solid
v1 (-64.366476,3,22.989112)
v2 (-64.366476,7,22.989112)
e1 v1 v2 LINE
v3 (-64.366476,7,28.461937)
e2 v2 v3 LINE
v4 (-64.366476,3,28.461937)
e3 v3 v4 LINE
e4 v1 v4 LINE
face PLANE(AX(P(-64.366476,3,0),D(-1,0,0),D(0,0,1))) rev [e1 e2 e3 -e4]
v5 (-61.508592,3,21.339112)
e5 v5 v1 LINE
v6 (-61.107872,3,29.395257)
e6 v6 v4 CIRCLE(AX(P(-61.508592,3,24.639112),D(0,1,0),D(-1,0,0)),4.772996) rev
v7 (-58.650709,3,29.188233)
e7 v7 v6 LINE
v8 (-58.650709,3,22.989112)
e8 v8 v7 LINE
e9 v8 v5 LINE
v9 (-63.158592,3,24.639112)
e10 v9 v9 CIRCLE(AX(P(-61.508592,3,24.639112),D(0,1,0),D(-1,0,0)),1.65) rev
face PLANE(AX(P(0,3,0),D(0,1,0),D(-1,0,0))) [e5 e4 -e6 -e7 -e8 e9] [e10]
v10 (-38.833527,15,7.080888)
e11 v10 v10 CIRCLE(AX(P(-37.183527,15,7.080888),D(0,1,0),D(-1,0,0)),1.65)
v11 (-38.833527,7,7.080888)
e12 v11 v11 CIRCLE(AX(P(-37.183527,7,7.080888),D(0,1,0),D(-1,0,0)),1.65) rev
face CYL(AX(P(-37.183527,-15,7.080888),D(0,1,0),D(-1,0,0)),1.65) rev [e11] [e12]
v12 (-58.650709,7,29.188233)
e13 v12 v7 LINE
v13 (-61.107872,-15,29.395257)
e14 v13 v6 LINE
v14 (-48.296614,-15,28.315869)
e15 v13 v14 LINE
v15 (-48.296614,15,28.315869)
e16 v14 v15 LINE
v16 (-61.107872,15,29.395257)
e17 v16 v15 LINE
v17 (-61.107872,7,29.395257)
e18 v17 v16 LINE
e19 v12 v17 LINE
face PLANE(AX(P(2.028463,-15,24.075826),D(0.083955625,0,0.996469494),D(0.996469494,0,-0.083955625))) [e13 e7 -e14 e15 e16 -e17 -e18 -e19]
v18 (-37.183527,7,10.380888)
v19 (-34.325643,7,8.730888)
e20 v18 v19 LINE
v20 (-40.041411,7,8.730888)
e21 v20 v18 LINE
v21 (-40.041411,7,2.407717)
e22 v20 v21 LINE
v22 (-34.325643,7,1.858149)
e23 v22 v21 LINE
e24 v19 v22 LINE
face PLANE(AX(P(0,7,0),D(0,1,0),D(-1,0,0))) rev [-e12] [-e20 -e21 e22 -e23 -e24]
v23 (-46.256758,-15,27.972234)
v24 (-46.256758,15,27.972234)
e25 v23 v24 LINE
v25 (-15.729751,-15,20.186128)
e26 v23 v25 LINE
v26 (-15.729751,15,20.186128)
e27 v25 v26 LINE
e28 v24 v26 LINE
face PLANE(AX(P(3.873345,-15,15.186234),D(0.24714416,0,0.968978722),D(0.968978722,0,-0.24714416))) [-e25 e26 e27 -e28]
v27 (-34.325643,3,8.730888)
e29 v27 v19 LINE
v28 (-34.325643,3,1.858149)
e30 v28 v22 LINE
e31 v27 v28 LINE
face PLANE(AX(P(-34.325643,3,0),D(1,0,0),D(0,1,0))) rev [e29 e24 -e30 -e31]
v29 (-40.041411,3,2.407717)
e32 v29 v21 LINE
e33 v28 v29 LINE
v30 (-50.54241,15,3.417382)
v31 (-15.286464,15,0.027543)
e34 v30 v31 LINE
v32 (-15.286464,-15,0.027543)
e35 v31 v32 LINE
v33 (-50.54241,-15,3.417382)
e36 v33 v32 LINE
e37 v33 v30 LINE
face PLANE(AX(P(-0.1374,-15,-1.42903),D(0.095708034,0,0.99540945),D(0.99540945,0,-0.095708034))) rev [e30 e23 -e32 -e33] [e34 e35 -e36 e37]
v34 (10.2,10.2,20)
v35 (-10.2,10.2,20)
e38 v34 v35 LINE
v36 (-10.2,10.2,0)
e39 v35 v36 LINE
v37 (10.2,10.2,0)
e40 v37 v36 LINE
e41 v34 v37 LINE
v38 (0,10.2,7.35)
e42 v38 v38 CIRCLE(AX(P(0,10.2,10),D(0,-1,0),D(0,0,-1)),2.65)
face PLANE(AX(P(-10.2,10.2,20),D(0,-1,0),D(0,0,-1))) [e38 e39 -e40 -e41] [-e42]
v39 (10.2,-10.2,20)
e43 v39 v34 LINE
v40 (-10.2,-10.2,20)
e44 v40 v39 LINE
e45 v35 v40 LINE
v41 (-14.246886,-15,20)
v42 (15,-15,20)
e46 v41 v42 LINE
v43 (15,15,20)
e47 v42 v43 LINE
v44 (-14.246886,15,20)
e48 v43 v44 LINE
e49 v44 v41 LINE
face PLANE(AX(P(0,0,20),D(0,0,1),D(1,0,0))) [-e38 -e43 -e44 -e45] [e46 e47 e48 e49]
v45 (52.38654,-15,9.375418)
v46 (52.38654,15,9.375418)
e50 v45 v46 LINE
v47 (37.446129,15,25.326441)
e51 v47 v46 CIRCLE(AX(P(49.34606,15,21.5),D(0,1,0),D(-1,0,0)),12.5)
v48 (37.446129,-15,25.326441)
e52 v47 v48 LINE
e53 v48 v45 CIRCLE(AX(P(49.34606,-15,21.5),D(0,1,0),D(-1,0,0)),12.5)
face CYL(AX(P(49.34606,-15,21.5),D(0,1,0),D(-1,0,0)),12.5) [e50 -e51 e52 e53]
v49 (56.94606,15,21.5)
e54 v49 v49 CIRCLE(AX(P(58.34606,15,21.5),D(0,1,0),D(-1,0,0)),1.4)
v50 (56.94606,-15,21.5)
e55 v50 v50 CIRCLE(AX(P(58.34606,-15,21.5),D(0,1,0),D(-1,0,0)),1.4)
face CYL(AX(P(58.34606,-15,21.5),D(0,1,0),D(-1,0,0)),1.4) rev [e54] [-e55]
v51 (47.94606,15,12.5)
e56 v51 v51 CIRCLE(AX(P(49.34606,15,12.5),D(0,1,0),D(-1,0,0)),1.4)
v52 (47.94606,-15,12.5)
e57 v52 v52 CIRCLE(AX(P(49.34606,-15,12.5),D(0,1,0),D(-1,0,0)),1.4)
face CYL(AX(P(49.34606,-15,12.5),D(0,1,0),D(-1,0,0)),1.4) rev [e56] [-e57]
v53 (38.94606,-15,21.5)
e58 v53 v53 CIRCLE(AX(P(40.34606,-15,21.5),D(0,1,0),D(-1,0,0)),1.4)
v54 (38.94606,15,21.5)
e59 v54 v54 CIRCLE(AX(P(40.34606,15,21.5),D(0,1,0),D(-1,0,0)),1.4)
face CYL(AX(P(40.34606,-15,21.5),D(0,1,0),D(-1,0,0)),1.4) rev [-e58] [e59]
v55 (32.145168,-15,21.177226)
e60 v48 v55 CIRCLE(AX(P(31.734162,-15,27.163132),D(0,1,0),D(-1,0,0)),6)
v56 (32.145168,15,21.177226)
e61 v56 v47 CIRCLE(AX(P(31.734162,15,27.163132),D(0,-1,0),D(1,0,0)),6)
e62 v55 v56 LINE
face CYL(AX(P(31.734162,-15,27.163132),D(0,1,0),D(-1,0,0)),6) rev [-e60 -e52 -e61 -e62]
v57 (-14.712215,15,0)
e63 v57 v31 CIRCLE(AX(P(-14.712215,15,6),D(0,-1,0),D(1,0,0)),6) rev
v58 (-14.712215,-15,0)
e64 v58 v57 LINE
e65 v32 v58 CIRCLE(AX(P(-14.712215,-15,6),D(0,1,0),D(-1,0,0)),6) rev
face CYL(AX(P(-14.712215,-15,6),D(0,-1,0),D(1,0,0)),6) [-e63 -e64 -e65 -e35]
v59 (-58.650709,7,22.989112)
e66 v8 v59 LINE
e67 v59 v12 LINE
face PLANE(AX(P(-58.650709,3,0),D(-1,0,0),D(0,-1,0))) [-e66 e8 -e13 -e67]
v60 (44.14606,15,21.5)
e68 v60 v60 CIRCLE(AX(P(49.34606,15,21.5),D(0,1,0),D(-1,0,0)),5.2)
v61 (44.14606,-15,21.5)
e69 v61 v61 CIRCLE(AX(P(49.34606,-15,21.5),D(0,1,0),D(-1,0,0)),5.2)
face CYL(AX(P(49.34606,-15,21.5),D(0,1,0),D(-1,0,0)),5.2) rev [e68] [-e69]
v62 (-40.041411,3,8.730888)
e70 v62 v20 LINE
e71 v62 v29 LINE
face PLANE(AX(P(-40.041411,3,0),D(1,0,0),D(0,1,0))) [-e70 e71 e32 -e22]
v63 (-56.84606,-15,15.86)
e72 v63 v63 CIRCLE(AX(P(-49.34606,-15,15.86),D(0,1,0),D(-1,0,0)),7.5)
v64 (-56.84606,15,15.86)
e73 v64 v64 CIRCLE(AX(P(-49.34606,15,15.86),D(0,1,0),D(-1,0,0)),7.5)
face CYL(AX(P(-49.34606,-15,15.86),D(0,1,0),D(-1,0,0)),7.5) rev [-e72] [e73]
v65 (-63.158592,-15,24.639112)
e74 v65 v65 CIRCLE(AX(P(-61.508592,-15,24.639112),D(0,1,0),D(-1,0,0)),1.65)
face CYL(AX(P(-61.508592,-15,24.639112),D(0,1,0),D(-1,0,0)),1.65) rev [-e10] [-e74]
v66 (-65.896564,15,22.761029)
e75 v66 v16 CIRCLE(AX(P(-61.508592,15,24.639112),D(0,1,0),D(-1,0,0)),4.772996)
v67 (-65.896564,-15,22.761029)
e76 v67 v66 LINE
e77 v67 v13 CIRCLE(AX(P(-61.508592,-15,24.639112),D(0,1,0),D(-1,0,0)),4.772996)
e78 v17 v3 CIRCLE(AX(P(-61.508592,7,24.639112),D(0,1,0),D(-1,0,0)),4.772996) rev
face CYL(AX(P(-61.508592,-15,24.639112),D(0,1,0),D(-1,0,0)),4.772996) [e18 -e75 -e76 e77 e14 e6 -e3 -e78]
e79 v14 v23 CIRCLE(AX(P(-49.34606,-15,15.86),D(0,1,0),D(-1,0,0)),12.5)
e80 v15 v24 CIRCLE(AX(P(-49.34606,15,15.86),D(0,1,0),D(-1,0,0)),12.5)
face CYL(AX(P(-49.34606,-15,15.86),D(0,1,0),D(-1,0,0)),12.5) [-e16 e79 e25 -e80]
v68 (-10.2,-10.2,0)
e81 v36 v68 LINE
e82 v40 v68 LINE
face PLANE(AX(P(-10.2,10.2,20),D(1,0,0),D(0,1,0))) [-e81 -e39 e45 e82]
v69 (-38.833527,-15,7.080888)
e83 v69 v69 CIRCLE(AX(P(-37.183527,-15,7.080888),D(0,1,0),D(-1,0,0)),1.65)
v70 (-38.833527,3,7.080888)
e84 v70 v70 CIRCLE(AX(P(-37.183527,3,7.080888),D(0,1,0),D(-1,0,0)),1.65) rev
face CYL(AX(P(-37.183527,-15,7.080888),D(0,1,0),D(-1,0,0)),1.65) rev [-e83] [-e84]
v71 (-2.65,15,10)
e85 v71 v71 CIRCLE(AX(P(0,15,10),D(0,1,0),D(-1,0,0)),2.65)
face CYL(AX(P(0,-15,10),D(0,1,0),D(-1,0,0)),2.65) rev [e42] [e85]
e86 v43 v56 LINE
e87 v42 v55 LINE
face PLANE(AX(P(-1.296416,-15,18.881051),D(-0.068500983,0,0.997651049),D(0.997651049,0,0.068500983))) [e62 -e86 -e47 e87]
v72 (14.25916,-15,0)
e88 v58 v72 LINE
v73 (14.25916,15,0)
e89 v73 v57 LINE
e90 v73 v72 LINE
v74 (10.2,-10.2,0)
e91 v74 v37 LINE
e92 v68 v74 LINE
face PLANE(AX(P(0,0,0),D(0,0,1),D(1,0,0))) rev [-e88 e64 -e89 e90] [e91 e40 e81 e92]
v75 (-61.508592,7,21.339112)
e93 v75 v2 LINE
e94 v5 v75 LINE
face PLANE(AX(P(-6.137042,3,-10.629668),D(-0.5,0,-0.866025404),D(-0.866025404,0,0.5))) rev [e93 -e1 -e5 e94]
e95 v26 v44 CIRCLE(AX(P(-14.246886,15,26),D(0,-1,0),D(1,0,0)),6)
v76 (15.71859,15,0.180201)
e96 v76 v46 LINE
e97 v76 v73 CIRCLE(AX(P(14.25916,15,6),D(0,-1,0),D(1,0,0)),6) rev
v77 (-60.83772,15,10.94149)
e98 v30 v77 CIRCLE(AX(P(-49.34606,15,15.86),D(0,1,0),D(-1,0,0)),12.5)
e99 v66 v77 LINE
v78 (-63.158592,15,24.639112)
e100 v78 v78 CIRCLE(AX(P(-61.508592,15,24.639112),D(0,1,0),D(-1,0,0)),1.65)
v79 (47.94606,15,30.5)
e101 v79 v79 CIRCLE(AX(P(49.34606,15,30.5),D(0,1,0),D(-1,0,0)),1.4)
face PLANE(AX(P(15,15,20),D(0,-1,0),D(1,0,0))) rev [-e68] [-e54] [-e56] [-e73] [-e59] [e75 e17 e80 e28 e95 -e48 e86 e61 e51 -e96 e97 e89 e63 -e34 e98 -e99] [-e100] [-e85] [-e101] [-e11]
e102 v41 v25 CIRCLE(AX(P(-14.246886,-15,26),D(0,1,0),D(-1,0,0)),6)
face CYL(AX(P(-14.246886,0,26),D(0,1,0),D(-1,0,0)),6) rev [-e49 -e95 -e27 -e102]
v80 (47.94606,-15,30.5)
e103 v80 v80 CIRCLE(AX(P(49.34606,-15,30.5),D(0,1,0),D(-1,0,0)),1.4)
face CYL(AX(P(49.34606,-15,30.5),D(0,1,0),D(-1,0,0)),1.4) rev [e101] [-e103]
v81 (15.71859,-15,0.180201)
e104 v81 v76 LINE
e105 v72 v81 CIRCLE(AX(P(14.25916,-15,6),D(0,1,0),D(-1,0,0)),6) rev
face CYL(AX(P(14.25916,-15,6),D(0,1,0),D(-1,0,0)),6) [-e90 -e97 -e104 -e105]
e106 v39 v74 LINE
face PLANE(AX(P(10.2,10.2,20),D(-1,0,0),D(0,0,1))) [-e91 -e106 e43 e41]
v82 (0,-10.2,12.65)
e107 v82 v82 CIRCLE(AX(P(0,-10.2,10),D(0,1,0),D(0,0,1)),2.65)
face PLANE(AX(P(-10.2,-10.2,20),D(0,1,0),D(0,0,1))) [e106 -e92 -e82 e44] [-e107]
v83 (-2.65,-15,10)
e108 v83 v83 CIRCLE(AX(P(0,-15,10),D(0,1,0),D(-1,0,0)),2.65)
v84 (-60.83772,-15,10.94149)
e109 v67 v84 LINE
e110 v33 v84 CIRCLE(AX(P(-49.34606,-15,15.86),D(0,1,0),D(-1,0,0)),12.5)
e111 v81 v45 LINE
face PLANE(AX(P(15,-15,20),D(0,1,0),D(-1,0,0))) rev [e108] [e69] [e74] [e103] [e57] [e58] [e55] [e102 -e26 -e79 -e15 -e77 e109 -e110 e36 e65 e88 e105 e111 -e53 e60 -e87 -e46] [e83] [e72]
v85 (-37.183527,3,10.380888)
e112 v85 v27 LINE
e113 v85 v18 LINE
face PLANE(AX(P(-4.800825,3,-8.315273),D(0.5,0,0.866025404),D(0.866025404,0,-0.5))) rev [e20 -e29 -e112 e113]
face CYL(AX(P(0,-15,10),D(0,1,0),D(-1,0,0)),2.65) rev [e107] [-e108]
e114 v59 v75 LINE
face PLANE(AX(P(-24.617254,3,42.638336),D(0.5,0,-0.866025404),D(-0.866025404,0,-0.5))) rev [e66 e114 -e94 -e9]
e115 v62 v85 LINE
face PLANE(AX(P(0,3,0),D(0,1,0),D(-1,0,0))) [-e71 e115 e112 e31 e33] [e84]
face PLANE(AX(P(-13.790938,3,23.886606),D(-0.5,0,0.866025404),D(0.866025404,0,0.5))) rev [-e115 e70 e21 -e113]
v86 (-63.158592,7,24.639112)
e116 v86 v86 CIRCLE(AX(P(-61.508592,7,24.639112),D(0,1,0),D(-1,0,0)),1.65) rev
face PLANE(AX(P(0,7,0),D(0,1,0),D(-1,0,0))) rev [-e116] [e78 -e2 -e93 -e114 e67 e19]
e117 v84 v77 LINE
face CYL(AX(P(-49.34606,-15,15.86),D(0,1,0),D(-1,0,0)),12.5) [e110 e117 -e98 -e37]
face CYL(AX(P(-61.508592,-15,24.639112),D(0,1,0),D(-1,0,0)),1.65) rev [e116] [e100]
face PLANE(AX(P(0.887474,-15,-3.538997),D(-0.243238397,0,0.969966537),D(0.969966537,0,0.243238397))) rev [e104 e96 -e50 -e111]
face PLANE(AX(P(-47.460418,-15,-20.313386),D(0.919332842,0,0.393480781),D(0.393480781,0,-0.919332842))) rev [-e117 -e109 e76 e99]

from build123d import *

# Parameters (mm, degrees)
SKETCH1_W           = 30
SKETCH1_H           = 30
SKETCH1_W_2         = 20.4
SKETCH1_H_2         = 20.4
BOSS_EXTRUDE1_DEPTH = 20
SKETCH2_R           = 2.65
CUT_EXTRUDE1_DEPTH  = 40.05124838
SKETCH3_R           = 1.65
SKETCH3_R_2         = 7.5
SKETCH3_R_3         = 1.4
SKETCH3_R_4         = 5.2
BOSS_EXTRUDE2_DEPTH = 30
CUT_EXTRUDE5_START  = -8
CUT_EXTRUDE5_DEPTH  = 4
FILLET1_R           = 6


with BuildPart() as part:
    # Sketch1 → Boss-Extrude1 (new body)
    with BuildSketch(Plane.XY):
        Rectangle(SKETCH1_W, SKETCH1_H)
        Rectangle(SKETCH1_W_2, SKETCH1_H_2, mode=Mode.SUBTRACT)
    extrude(amount=BOSS_EXTRUDE1_DEPTH)

    # Sketch2 → Cut-Extrude1 (cut, through all)
    with BuildSketch(Plane(origin=(0, 15, 0), x_dir=(1, 0, 0), z_dir=(0, 1, 0))):
        with Locations(Location((0, -10, 0), (0, 0, 180))):
            Circle(SKETCH2_R)
    extrude(amount=-CUT_EXTRUDE1_DEPTH, mode=Mode.SUBTRACT)

    # Sketch3 → Boss-Extrude2 (add)
    # profile 1 of 2: a face of its own
    with BuildSketch(Plane(origin=(0, 15, 0), x_dir=(1, 0, 0), z_dir=(0, 1, 0))):
        with BuildLine():
            ThreePointArc((-65.896564393, -22.761029428), (-65.378707028, -27.432622684), (-61.107872478, -29.395256638))
            Line((-61.107872478, -29.395256638), (-48.296614461, -28.315868679))
            ThreePointArc((-48.296614461, -28.315868679), (-47.269565487, -28.186320273), (-46.256757774, -27.972234028))
            Line((-46.256757774, -27.972234028), (-15, -20))
            Line((-15, -20), (-15, 0))
            Line((-15, 0), (-50.542410203, -3.417381881))
            ThreePointArc((-50.542410203, -3.417381881), (-56.721658538, -5.767897005), (-60.8377203, -10.941490233))
            Line((-60.8377203, -10.941490233), (-65.896564393, -22.761029428))
        make_face()
        with Locations(Location((-61.508592346, -24.639111653, 0), (0, 0, 180))):
            Circle(SKETCH3_R, mode=Mode.SUBTRACT)
        with Locations(Location((-49.346059773, -15.86, 0), (0, 0, 180))):
            Circle(SKETCH3_R_2, mode=Mode.SUBTRACT)
        with Locations(Location((-37.1835272, -7.080888347, 0), (0, 0, 180))):
            Circle(SKETCH3_R, mode=Mode.SUBTRACT)
    # profile 2 of 2: a face of its own
    with BuildSketch(Plane(origin=(0, 15, 0), x_dir=(1, 0, 0), z_dir=(0, 1, 0))):
        with BuildLine():
            Line((52.386539741, -9.375418293), (15, 0))
            Line((15, 0), (15, -20))
            Line((15, -20), (36.846059773, -21.5))
            ThreePointArc((36.846059773, -21.5), (57.035142957, -31.355353865), (52.386539741, -9.375418293))
        make_face()
        with Locations(Location((49.346059773, -12.5, 0), (0, 0, 180))):
            Circle(SKETCH3_R_3, mode=Mode.SUBTRACT)
        with Locations(Location((49.346059773, -30.5, 0), (0, 0, 180))):
            Circle(SKETCH3_R_3, mode=Mode.SUBTRACT)
        with Locations(Location((40.346059773, -21.5, 0), (0, 0, 180))):
            Circle(SKETCH3_R_3, mode=Mode.SUBTRACT)
        with Locations(Location((49.346059773, -21.5, 0), (0, 0, 180))):
            Circle(SKETCH3_R_4, mode=Mode.SUBTRACT)
        with Locations(Location((58.346059773, -21.5, 0), (0, 0, 180))):
            Circle(SKETCH3_R_3, mode=Mode.SUBTRACT)
    extrude(amount=-BOSS_EXTRUDE2_DEPTH)

    # Sketch5 → Cut-Extrude5 (cut)
    with BuildSketch(Plane(origin=(0, 15, 0), x_dir=(1, 0, 0), z_dir=(0, 1, 0)).offset(CUT_EXTRUDE5_START)):
        Polygon((-40.041411033, -8.730888347), (-37.1835272, -10.380888347), (-34.325643368, -8.730888347), align=None)
        Polygon((-40.041411033, -8.730888347), (-34.325643368, -8.730888347), (-34.325643368, -5.430888347), (-37.1835272, -3.780888347), (-40.041411033, -5.430888347), align=None)
        Polygon((-37.1835272, -3.780888347), (-34.325643368, -5.430888347), (-34.325643368, 4.153358906), (-40.041411033, 4.153358906), (-40.041411033, -5.430888347), align=None)
        Polygon((-64.366476179, -26.289111653), (-61.508592346, -27.939111653), (-58.650708514, -26.289111653), (-58.650708514, -22.989111653), (-64.366476179, -22.989111653), align=None)
        Polygon((-58.650708514, -26.289111653), (-61.508592346, -27.939111653), (-64.366476179, -26.289111653), (-64.366476179, -31.820729818), (-58.650708514, -31.820729818), align=None)
        Polygon((-64.366476179, -22.989111653), (-58.650708514, -22.989111653), (-61.508592346, -21.339111653), align=None)
    extrude(amount=-CUT_EXTRUDE5_DEPTH, mode=Mode.SUBTRACT)

    # Fillet1
    # the kernel refuses this fillet: 6 mm, written as the material it adds along each edge
    with BuildSketch(Plane(origin=(36.846059773, 15, 21.5), x_dir=(0.15492828046990675, 0, 0.9879257198345622), z_dir=(0, -1, 0))) as fillet1_piece_1:
        with BuildLine():
            CenterArc((4.802776695, 5.927554319), FILLET1_R, 192.840529968, 68.246833251)
            Line((-1.047177652, 4.594124851), (0, 0))
            ThreePointArc((0, 0), (1.936603506, 0.150928502), (3.873207012, 0))
        make_face()
    extrude(amount=30)
    with BuildSketch(Plane(origin=(-15, -15, 20), x_dir=(1, 0, 0), z_dir=(0, 1, 0))) as fillet1_piece_2:
        with BuildLine():
            CenterArc((FILLET1_R * 0.125518959216, -FILLET1_R), FILLET1_R, 90, 14.308582401)
            Line((-FILLET1_R * 0.121625200721, -FILLET1_R * 0.0310212777315), (0, 0))
            Line((0, 0), (FILLET1_R * 0.125518959216, 0))
        make_face()
    extrude(amount=30)
    # the kernel refuses this fillet: 6 mm, written as the material it takes off along each edge
    with BuildSketch(Plane(origin=(15, 16.852100476, 0), x_dir=(-1, 0, 0), z_dir=(0, -1, 0))) as fillet1_2_piece_1:
        with BuildLine():
            CenterArc((FILLET1_R * 0.123473365094, -FILLET1_R), FILLET1_R, 90, 14.07775236)
            Line((-FILLET1_R * 0.119765032297, -FILLET1_R * 0.0300334634457), (0, 0))
            Line((0, 0), (FILLET1_R * 0.123473365094, 0))
        make_face()
    extrude(amount=33.704200953, mode=Mode.SUBTRACT)
    with BuildSketch(Plane(origin=(-15, -15.71946162, 0), x_dir=(1, 0, 0), z_dir=(0, 1, 0))) as fillet1_2_piece_2:
        with BuildLine():
            CenterArc((FILLET1_R * 0.0479641080127, -FILLET1_R), FILLET1_R, 90, 5.492072889)
            Line((-FILLET1_R * 0.0477439263528, -FILLET1_R * 0.004590550498), (0, 0))
            Line((0, 0), (FILLET1_R * 0.0479641080127, 0))
        make_face()
    extrude(amount=31.43892324, mode=Mode.SUBTRACT)


solid = part.part
